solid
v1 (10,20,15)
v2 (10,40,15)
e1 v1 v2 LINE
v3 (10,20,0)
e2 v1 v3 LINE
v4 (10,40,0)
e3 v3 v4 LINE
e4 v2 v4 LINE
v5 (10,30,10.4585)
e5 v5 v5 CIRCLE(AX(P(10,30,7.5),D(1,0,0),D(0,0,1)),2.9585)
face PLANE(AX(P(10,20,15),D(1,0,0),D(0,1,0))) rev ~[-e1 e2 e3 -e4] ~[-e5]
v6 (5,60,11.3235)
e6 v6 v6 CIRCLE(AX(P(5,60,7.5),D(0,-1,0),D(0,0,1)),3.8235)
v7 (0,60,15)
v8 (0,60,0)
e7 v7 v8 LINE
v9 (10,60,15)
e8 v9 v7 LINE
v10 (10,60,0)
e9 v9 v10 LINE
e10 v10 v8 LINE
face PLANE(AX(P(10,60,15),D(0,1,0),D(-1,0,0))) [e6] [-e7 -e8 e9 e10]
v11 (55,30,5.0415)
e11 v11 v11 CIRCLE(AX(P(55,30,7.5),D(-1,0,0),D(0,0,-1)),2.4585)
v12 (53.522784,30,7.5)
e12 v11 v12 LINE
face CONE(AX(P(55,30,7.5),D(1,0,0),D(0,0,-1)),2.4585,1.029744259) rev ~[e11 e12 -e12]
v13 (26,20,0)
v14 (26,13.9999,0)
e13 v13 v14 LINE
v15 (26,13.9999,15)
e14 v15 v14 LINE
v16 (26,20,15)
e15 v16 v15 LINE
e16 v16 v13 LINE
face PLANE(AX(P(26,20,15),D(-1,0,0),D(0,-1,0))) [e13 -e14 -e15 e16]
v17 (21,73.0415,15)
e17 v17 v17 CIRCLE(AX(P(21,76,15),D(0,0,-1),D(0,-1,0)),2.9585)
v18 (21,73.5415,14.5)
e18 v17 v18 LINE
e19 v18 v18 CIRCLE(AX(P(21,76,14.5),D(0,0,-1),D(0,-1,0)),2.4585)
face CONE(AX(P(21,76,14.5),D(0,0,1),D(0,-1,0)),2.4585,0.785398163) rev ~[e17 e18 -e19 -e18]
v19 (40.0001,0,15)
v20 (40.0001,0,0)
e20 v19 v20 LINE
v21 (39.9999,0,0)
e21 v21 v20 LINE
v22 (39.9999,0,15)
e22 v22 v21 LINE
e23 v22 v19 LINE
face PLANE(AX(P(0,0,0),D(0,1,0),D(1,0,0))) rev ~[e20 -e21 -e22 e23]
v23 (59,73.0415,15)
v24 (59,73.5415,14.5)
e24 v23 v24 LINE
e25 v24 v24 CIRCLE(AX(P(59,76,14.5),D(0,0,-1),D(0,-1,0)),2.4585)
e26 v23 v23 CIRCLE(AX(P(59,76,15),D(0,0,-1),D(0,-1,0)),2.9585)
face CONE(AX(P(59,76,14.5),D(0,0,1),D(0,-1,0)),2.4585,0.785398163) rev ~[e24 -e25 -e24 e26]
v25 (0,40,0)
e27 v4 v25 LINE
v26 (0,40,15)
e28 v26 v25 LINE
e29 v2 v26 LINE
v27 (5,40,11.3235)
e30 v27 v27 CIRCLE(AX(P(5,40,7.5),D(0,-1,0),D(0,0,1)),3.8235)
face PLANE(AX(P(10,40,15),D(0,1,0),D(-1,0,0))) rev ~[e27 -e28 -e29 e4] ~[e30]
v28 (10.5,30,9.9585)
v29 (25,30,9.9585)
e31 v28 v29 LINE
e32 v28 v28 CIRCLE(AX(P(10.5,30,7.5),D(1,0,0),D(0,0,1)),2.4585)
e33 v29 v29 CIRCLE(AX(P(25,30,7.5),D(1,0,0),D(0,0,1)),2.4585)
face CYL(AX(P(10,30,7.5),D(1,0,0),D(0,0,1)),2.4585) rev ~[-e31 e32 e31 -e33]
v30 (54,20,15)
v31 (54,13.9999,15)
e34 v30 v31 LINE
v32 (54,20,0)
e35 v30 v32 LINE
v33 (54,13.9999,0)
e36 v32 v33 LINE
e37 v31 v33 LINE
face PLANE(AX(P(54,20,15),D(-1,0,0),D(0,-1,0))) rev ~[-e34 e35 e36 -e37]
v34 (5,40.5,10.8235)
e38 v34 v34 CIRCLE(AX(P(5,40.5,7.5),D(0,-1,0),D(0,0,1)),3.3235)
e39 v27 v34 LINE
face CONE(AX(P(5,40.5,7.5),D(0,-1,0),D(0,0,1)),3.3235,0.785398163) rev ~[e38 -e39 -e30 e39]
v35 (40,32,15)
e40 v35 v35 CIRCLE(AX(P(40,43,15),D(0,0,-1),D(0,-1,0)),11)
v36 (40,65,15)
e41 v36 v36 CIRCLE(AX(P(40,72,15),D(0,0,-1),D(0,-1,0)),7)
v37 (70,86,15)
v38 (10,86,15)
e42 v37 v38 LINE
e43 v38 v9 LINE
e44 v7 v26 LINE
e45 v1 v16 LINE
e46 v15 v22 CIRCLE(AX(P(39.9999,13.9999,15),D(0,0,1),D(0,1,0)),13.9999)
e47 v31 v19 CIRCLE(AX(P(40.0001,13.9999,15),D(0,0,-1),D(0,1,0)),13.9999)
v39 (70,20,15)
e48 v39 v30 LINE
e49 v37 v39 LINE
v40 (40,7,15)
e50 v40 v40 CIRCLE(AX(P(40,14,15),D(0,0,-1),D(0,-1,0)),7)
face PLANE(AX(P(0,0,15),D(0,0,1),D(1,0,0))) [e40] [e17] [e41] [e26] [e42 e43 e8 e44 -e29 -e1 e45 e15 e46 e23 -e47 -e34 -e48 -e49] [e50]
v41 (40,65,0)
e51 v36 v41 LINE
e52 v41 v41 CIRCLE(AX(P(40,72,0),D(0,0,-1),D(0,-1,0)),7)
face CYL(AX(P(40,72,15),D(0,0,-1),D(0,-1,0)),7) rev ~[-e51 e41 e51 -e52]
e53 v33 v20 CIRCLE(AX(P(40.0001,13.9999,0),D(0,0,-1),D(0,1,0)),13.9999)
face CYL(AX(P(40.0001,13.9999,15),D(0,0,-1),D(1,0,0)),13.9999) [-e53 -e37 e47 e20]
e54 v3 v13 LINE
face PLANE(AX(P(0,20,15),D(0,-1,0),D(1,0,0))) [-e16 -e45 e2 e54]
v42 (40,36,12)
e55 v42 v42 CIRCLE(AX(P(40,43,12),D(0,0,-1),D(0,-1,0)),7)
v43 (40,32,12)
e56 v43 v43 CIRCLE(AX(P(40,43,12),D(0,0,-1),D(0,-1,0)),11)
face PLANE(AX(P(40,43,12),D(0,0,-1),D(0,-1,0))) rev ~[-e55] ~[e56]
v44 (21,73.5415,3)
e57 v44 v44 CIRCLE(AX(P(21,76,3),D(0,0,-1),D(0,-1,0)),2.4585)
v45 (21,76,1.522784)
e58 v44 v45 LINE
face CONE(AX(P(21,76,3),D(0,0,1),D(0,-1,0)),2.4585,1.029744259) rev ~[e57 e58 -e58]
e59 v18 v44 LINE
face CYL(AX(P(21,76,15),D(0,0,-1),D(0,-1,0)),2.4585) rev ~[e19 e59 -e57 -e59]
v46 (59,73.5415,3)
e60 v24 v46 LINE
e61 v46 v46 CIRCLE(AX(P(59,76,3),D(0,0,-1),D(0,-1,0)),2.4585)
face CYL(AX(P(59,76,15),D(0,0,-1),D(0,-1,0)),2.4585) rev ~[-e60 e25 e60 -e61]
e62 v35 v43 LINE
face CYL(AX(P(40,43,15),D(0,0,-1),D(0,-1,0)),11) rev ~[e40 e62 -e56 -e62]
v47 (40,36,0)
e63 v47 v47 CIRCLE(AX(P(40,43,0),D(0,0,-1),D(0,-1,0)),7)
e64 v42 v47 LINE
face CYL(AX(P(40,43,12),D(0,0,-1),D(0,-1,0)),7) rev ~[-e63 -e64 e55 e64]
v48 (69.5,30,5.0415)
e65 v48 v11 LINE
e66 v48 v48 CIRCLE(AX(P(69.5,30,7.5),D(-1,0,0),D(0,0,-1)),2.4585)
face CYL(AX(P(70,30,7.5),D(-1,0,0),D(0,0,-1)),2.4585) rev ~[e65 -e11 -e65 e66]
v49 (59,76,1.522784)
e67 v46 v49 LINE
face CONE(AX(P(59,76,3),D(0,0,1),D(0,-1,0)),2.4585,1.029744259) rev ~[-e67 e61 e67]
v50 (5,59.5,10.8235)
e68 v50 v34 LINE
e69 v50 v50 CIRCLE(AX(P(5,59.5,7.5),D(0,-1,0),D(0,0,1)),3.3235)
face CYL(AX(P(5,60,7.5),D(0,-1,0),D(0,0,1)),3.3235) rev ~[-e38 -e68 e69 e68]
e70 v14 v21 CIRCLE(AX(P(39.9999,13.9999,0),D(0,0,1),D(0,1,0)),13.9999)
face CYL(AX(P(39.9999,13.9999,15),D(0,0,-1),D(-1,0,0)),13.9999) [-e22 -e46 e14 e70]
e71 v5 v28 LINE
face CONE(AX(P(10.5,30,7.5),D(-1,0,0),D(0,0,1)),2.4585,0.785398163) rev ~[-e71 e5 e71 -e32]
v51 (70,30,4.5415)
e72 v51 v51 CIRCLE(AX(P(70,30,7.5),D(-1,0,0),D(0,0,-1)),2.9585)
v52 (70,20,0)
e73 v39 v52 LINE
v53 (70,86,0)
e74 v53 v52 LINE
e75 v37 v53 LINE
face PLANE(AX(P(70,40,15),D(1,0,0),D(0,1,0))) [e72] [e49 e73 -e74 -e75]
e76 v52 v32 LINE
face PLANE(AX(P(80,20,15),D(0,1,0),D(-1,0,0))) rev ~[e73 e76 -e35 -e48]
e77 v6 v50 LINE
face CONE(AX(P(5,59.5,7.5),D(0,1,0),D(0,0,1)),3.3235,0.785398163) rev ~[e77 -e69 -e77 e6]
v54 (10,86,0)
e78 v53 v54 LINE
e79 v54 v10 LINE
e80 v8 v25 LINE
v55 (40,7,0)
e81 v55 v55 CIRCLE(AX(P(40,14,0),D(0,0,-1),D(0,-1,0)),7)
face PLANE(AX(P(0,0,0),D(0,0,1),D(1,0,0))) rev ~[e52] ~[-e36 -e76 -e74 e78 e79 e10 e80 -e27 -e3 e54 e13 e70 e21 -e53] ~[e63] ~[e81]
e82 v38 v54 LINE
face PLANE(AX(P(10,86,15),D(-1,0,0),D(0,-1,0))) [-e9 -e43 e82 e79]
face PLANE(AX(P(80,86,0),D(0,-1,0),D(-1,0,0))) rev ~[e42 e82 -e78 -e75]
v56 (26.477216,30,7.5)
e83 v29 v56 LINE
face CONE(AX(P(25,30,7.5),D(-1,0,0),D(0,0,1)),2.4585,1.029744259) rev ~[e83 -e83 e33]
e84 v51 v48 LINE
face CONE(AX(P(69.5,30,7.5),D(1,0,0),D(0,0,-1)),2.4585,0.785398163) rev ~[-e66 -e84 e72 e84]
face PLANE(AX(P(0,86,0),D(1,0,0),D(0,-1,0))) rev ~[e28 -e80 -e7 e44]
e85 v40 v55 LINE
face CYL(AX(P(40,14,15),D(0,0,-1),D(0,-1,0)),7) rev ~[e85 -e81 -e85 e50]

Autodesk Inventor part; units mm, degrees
ref_plane "YZ Plane" through (0, 0, 0) normal (1, 0, 0) x (0, 1, 0)
ref_plane "XZ Plane" through (0, 0, 0) normal (0, 1, 0) x (-1, 0, 0)
ref_plane "XY Plane" through (0, 0, 0) normal (0, 0, 1) x (1, 0, 0)
sketch "Sketch1" plane through (0, 0, 0) normal (0, 0, 1) x (1, 0, 0)
  line L0 (0, 0) -> (80, 0)
  line L1 (80, 0) -> (80, 86)
  line L2 (80, 86) -> (0, 86)
  line L3 (0, 86) -> (0, 0)
  dimension "d0" = 80
  dimension "d1" = 86
extrude "Extrusion1" add sketch "Sketch1" along normal blind 15
sketch "Sketch2" plane through (0, 0, 15) normal (0, 0, 1) x (1, 0, 0)
  line L0 (0, 0) -> (0, 86) projected
  line L1 (80, 0) -> (0, 0) projected
  line L2 (80, 86) -> (80, 0) projected
  line L3 (0, 86) -> (80, 86) projected
  line L4 (0, 86) -> (10, 86)
  line L5 (10, 86) -> (10, 60)
  line L6 (10, 60) -> (0, 60)
  line L7 (0, 60) -> (0, 86)
  line L8 (70, 86) -> (80, 86)
  line L9 (80, 86) -> (80, 40)
  line L10 (80, 40) -> (70, 40)
  line L11 (70, 40) -> (70, 86)
  line L12 (54, 0) -> (80, 0)
  line L13 (80, 0) -> (80, 20)
  line L14 (80, 20) -> (54, 20)
  line L15 (54, 20) -> (54, 0)
  line L16 (0, 20) -> (26, 20)
  line L17 (26, 20) -> (26, 0)
  line L18 (26, 0) -> (0, 0)
  line L19 (0, 0) -> (0, 20)
  dimension "d4" = 20
  dimension "d5" = 20
  dimension "d6" = 20
  dimension "d7" = 10
  dimension "d8" = 10
  dimension "d9" = 40
  dimension "d10" = 28
  dimension "d11" = 26
extrude "Extrusion2" cut sketch "Sketch2" against normal blind 15 contours L0 L16 L17 L1 | L0 L3 L5 L6 | L15 L14 L2 L1 | L3 L2 L10 L11
sketch "Sketch3" plane through (0, 0, 15) normal (0, 0, 1) x (1, 0, 0)
  line L0 (10, 86) -> (10, 60) projected
  line L1 (10, 60) -> (0, 60) projected
  line L2 (0, 20) -> (0, 60) projected
  line L3 (0, 20) -> (26, 20) projected
  line L4 (26, 20) -> (26, 0) projected
  line L5 (54, 0) -> (26, 0) projected
  line L6 (54, 0) -> (54, 20) projected
  line L7 (54, 20) -> (80, 20) projected
  line L8 (80, 40) -> (80, 20) projected
  line L9 (80, 40) -> (70, 40) projected
  line L10 (70, 40) -> (70, 86) projected
  line L11 (10, 86) -> (70, 86) projected
  line L12 (0, 20) -> (10, 20)
  line L13 (10, 20) -> (10, 40)
  line L14 (10, 40) -> (0, 40)
  line L15 (0, 40) -> (0, 20)
  point P0 (0, 0)
  dimension "d14" = 10
  dimension "d15" = 20
extrude "Extrusion3" cut sketch "Sketch3" against normal blind 15 contours L14 L13 L3 L2
sketch "Sketch4" plane through (0, 0, 15) normal (0, 0, 1) x (1, 0, 0)
  line L0 (26, 20) -> (26, 0) projected
  line L1 (54, 0) -> (26, 0) projected
  line L2 (10, 86) -> (70, 86) projected
  line L3 (0, 40) -> (0, 60) projected
  point P0 (0, 0)
  point P1 (40, 72)
  point P2 (40, 14)
  dimension "d18" = 14
  dimension "d19" = 40
  dimension "d20" = 14
  dimension "d21" = 14
hole "Hole1" at (40, 72, 15) at (40, 14, 15) direction (0, 0, -1) diameter 14 depth 15 tip angle 118
sketch "Sketch5" plane through (0, 0, 15) normal (0, 0, 1) x (1, 0, 0)
  circle A0 centre (40, 72) radius 7 projected
  line L0 (0, 40) -> (0, 60) projected
  point P0 (0, 0)
  point P1 (40, 43)
  dimension "d29" = 29
  dimension "d30" = 40
hole "Hole2" at (40, 43, 15) direction (0, 0, -1) diameter 14 depth 18 tip angle 118 counterbore diameter 22 counterbore depth 3
fillet "Fillet1" radius 14 2 edges at (26, 0, 7.5) (54, 0, 7.5)
sketch "Sketch6" plane through (0, 0, 15) normal (0, 0, 1) x (1, 0, 0)
  line L0 (70, 40) -> (80, 40)
  line L1 (80, 40) -> (80, 20)
  line L2 (80, 20) -> (70, 20)
  line L3 (70, 20) -> (70, 40)
  point P0 (0, 0)
extrude "Extrusion4" cut sketch "Sketch6" against normal blind 15
sketch "Sketch7" plane through (0, 60, 15) normal (0, 1, 0) x (1, 0, 0)
  line L0 (0, 15) -> (10, 15) projected
  line L1 (10, 0) -> (10, 15) projected
  point P0 (5, 7.5)
  dimension "d41" = 7.5
  dimension "d42" = 5
hole "Hole3" at (5, 60, 7.5) direction (0, -1, 0) diameter 6.647 depth 20 tip angle 118 thread size "M8x1.25" class "6H" standard "ANSI Metric M Profile"
chamfer "Chamfer1" distance 0.5 angle 45 2 edges at (5, 60, 4.1765) (5, 40, 4.1765)
sketch "Sketch8" plane through (0, 0, 15) normal (0, 0, 1) x (1, 0, 0)
  circle A0 centre (40, 72) radius 7 projected
  line L0 (10, 86) -> (70, 86) projected
  point P0 (0, 0)
  point P1 (21, 76)
  point P2 (59, 76)
  dimension "d53" = 38
  dimension "d54" = 19
  dimension "d55" = 10
hole "Hole4" at (21, 76, 15) at (59, 76, 15) direction (0, 0, -1) diameter 4.917 depth 12 tip angle 118 thread size "M6x1" class "6H" standard "ANSI Metric M Profile"
chamfer "Chamfer2" distance 0.5 angle 45 2 edges at (21, 78.4585, 15) (59, 78.4585, 15)
sketch "Sketch9" plane through (70, 20, 15) normal (1, 0, 0) x (0, 0, -1)
  line L0 (15, 66) -> (15, 0) projected
  line L1 (0, 66) -> (15, 66) projected
  point P0 (15, -20)
  point P1 (7.5, 10)
  dimension "d66" = 7.5
  dimension "d67" = 56
hole "Hole5" at (70, 30, 7.5) direction (-1, 0, 0) diameter 4.917 depth 15 tip angle 118 thread size "M6x1" class "6H" standard "ANSI Metric M Profile"
chamfer "Chamfer3" distance 0.5 angle 45 1 edges at (70, 30, 9.9585)
sketch "Sketch10" plane through (10, 20, 15) normal (-1, 0, 0) x (0, 0, 1)
  line L0 (-15, 0) -> (-15, 20) projected
  line L1 (0, 0) -> (-15, 0) projected
  point P0 (-15, -20)
  point P1 (-7.5, 10)
  dimension "d78" = 10
  dimension "d79" = 7.5
hole "Hole6" at (10, 30, 7.5) direction (1, 0, 0) diameter 4.917 depth 15 tip angle 118 thread size "M6x1" class "6H" standard "ANSI Metric M Profile"
chamfer "Chamfer4" distance 0.5 angle 45 1 edges at (10, 30, 5.0415)
properties part number "PLACA COM FUROS COORDENADOS(13)" material "Carbon Steel"
